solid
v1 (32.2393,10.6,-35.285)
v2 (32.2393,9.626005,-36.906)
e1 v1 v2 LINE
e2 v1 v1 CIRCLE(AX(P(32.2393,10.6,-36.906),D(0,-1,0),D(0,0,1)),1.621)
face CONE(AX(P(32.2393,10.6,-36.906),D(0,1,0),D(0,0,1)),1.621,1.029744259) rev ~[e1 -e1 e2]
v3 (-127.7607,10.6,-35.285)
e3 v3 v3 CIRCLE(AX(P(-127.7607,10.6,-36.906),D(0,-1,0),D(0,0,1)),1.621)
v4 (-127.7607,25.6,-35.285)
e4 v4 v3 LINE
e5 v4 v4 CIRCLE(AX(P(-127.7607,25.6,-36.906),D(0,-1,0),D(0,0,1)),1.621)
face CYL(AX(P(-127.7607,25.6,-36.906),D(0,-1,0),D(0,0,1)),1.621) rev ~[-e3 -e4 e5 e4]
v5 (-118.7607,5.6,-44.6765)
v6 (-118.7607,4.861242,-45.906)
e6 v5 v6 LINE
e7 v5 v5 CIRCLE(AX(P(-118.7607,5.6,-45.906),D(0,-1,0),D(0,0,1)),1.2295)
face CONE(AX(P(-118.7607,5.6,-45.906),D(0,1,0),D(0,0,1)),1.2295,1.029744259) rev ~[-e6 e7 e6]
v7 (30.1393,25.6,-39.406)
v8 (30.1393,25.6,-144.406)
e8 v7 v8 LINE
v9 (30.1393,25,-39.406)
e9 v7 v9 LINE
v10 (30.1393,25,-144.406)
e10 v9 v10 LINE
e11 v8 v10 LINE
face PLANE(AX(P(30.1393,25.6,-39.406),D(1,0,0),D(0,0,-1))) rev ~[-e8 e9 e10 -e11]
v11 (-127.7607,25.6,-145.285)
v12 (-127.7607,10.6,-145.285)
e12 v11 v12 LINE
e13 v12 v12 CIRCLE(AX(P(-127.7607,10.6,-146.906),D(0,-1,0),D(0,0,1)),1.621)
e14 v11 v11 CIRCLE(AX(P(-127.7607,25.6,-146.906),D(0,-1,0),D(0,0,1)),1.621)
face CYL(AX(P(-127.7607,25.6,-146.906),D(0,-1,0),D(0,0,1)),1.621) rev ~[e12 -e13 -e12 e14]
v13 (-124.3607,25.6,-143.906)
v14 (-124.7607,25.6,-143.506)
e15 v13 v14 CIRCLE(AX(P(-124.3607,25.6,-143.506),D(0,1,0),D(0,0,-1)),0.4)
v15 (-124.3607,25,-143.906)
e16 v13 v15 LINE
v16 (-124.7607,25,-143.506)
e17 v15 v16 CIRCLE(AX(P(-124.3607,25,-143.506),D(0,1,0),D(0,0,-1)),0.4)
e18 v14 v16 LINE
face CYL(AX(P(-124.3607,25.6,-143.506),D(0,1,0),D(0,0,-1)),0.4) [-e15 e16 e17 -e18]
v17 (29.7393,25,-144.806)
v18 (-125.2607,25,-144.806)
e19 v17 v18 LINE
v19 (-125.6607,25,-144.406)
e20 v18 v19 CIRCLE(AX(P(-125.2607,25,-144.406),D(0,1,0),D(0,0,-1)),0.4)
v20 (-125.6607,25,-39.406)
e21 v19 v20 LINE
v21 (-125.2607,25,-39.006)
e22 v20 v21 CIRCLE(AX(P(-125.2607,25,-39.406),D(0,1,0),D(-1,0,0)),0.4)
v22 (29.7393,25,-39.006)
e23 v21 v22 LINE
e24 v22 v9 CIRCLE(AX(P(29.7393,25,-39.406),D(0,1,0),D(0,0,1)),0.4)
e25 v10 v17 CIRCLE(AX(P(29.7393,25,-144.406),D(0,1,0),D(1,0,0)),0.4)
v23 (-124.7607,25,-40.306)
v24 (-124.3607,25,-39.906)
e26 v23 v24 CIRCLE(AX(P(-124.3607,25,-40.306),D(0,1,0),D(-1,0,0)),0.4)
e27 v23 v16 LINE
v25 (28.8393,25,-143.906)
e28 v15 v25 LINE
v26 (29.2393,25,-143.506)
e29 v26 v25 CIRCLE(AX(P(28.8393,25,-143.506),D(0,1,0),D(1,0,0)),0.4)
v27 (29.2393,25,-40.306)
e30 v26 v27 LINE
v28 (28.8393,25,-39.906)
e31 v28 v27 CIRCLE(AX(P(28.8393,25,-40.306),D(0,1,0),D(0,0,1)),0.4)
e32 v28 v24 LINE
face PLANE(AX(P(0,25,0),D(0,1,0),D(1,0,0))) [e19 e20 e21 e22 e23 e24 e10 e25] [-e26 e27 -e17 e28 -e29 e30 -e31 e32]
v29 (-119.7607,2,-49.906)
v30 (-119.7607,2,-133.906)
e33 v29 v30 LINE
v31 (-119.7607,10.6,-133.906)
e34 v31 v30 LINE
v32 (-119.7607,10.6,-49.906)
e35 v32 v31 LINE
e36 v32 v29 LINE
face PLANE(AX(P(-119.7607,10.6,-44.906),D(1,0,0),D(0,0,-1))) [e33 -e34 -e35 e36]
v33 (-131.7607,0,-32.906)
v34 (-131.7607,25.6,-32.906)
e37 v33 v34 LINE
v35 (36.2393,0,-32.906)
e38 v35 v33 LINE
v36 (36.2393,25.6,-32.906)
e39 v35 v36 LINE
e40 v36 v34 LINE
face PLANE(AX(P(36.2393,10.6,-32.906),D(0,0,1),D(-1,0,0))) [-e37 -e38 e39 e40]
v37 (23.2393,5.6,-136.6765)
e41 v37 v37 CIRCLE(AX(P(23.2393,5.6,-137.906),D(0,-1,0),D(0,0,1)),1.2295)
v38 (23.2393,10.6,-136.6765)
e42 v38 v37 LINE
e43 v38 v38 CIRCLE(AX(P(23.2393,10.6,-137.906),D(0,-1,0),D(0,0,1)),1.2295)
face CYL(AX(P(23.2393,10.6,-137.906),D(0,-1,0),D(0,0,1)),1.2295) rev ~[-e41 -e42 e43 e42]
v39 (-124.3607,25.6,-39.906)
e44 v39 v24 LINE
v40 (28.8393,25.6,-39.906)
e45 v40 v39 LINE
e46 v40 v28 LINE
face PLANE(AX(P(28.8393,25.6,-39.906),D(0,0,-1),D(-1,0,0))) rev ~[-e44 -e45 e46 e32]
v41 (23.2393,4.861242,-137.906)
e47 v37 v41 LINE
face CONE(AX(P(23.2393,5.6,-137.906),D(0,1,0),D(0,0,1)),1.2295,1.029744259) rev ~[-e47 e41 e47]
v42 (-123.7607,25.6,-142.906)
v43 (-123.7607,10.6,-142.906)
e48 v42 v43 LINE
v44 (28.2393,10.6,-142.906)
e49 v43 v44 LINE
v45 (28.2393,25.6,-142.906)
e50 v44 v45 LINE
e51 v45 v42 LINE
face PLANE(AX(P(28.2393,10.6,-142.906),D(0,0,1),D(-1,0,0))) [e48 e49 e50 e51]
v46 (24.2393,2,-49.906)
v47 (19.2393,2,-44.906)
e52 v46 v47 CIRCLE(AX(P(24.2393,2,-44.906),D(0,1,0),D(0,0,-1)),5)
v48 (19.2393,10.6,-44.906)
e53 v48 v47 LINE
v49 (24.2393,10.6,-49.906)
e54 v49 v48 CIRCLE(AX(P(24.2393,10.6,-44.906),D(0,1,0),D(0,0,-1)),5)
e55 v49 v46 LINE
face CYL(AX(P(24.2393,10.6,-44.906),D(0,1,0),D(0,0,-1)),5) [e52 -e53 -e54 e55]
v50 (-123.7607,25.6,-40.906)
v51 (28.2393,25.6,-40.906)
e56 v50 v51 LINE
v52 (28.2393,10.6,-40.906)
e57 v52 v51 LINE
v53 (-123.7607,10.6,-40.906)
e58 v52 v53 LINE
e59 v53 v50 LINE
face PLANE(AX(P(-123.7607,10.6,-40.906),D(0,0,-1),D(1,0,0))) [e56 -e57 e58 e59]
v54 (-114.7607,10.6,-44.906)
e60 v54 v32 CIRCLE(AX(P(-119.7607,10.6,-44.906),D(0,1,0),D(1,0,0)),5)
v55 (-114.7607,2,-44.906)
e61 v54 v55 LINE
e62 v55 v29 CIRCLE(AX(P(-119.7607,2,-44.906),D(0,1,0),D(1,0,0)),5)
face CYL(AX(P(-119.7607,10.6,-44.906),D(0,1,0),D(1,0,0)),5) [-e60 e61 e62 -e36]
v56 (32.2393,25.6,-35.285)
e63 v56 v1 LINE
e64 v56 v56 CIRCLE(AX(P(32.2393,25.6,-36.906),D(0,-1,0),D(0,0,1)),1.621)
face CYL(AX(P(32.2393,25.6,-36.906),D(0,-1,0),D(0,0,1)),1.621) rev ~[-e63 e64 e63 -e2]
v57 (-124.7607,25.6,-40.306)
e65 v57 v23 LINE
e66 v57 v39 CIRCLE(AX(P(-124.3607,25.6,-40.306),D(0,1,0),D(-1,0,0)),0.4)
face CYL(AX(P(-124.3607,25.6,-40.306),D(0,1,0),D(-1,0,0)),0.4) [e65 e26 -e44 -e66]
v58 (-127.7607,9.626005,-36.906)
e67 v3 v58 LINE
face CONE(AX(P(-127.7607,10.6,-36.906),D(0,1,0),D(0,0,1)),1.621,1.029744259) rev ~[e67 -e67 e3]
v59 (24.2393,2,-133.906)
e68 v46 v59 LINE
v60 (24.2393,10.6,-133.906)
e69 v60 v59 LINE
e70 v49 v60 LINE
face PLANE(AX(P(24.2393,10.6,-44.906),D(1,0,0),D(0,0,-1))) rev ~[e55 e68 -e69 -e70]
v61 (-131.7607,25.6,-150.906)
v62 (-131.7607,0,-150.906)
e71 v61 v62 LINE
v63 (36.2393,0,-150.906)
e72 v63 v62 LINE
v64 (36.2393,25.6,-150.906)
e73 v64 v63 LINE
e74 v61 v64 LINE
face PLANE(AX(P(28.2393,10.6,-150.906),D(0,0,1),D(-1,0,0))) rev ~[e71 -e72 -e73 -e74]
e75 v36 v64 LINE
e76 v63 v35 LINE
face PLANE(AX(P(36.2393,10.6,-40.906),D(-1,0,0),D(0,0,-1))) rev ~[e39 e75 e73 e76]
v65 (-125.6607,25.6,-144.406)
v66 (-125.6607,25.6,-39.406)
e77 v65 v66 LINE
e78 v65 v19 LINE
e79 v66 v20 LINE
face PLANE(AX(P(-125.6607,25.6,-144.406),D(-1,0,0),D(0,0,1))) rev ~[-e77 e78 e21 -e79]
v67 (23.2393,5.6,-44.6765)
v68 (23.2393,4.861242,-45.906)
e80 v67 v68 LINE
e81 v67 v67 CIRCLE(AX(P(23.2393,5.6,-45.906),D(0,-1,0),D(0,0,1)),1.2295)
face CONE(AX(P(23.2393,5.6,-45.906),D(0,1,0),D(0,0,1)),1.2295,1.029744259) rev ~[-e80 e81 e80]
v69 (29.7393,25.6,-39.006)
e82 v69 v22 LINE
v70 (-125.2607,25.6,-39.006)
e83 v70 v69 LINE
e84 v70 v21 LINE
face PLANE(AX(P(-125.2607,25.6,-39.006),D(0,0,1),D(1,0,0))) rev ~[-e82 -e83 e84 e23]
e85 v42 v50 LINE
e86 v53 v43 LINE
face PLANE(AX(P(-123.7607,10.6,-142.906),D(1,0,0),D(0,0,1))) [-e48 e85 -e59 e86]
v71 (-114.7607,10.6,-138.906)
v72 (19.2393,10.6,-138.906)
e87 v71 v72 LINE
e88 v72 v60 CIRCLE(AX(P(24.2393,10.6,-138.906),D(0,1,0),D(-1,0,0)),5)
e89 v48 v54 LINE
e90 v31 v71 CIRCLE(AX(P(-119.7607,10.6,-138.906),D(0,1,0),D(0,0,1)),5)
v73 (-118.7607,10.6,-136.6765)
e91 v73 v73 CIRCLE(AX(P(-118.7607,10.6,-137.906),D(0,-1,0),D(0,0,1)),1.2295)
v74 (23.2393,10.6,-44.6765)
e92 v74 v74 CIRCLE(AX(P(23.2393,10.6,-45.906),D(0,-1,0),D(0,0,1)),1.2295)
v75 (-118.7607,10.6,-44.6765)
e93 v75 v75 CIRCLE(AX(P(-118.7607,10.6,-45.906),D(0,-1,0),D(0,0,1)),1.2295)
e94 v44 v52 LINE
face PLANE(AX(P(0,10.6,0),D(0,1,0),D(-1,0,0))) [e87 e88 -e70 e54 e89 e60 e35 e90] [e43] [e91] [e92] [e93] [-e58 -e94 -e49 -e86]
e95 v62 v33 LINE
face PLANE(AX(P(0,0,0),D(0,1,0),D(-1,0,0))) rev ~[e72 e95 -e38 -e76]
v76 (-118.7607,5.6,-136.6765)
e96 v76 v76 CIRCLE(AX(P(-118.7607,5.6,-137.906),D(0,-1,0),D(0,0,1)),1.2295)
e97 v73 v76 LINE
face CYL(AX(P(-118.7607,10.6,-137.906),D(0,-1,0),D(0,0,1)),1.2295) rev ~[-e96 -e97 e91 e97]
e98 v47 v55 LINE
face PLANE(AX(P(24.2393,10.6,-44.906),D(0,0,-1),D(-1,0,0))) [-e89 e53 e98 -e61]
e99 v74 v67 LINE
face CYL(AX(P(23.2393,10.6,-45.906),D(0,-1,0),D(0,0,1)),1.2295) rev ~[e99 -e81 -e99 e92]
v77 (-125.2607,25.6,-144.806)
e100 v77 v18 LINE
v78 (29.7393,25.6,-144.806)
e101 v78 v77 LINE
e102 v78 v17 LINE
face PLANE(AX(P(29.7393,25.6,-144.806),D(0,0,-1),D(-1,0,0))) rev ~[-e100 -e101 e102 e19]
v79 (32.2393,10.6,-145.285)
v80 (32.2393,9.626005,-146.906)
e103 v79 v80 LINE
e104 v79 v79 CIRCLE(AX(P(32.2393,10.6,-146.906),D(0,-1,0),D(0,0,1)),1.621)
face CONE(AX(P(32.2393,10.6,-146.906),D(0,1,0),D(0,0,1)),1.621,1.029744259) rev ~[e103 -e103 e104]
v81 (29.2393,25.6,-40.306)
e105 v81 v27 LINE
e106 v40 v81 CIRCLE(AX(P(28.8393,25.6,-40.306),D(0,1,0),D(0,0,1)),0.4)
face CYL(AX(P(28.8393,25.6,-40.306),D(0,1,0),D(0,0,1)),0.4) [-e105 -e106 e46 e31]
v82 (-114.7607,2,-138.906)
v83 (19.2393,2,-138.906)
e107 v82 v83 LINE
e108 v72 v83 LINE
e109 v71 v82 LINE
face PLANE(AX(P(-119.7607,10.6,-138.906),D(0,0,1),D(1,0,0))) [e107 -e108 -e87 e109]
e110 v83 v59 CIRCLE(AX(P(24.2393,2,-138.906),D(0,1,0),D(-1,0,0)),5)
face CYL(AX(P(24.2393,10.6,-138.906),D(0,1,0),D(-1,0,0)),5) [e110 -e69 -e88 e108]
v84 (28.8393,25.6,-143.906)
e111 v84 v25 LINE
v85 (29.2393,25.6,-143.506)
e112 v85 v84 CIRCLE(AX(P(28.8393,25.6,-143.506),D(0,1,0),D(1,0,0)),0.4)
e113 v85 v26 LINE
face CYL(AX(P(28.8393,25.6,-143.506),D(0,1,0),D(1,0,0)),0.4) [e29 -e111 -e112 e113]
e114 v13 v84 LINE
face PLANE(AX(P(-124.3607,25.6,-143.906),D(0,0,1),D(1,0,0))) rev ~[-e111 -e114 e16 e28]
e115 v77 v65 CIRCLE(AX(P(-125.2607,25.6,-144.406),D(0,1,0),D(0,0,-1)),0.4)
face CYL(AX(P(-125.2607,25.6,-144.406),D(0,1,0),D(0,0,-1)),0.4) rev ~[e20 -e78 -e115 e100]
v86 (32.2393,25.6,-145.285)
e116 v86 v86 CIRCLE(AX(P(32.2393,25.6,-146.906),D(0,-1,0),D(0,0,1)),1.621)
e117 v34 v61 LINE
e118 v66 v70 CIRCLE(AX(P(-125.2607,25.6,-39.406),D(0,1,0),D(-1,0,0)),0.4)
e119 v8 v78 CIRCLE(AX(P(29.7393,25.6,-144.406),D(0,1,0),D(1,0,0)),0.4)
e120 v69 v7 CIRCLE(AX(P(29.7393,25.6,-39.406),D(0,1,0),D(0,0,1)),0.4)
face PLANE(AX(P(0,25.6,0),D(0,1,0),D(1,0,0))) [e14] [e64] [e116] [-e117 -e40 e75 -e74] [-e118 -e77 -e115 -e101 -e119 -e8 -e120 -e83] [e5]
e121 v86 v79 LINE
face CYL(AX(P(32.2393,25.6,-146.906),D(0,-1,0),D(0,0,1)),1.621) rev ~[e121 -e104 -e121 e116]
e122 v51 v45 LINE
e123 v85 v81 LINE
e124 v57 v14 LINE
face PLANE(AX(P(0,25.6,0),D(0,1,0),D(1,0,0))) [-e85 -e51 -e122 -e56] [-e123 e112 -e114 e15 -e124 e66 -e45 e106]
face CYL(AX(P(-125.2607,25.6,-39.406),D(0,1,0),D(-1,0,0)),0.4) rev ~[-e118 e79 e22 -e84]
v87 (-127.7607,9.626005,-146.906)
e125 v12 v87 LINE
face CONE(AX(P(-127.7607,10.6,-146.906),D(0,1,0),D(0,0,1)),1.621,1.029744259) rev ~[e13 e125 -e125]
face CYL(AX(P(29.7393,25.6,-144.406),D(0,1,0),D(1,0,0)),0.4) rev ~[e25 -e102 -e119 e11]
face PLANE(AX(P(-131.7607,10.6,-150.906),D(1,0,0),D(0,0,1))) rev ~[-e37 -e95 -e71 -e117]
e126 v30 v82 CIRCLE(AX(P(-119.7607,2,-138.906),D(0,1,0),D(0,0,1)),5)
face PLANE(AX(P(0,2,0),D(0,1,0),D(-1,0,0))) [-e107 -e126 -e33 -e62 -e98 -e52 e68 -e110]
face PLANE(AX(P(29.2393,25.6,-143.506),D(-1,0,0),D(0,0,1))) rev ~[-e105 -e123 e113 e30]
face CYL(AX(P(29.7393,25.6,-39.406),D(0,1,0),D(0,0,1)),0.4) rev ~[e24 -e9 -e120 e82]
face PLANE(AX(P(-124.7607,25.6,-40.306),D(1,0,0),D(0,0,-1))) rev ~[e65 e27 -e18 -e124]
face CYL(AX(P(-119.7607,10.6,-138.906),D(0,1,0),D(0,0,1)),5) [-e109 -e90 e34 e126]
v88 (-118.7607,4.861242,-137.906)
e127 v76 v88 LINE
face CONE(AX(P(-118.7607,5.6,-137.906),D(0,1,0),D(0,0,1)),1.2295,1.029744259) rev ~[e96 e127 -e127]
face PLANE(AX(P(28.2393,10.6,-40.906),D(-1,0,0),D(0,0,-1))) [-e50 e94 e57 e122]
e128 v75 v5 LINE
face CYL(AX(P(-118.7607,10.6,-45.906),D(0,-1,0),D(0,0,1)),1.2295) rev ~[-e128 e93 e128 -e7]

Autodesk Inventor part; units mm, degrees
ref_plane "YZ Plane" through (0, 0, 0) normal (1, 0, 0) x (0, 1, 0)
ref_plane "XZ Plane" through (0, 0, 0) normal (0, 1, 0) x (-1, 0, 0)
ref_plane "XY Plane" through (0, 0, 0) normal (0, 0, 1) x (1, 0, 0)
sketch "Esboço9" plane through (0, 0, 0) normal (0, 1, 0) x (-1, 0, 0)
  line L0 (123.7607, -142.906) -> (-28.2393, -142.906)
  line L1 (-28.2393, -142.906) -> (-28.2393, -40.906)
  line L2 (-28.2393, -40.906) -> (123.7607, -40.906)
  line L3 (123.7607, -40.906) -> (123.7607, -142.906)
  point P0 (0, 0)
  dimension "d42" = 152
  dimension "d43" = 102
extrude "Extrusão7" add sketch "Esboço9" along normal blind 10.6
shell "Casca2" thickness 2 removed faces 1 at (-22.4273, 10.6, -74.906)
sketch "Esboço10" plane through (0, 10.6, 0) normal (0, 1, 0) x (1, 0, 0)
  line L0 (-123.7607, 142.906) -> (-123.7607, 40.906) projected
  line L1 (-123.7607, 40.906) -> (28.2393, 40.906) projected
  line L2 (28.2393, 142.906) -> (-123.7607, 142.906) projected
  line L3 (28.2393, 40.906) -> (28.2393, 142.906) projected
  line L4 (-123.7607, 40.906) -> (-131.7607, 40.906)
  line L5 (-131.7607, 40.906) -> (-131.7607, 142.906)
  line L6 (-131.7607, 142.906) -> (-123.7607, 142.906)
  line L7 (-123.7607, 142.906) -> (-123.7607, 40.906)
  line L8 (-131.7607, 142.906) -> (28.2393, 142.906)
  line L9 (28.2393, 142.906) -> (28.2393, 150.906)
  line L10 (28.2393, 150.906) -> (-131.7607, 150.906)
  line L11 (-131.7607, 150.906) -> (-131.7607, 142.906)
  line L12 (28.2393, 40.906) -> (36.2393, 40.906)
  line L13 (36.2393, 40.906) -> (36.2393, 150.906)
  line L14 (36.2393, 150.906) -> (28.2393, 150.906)
  line L15 (28.2393, 150.906) -> (28.2393, 40.906)
  line L16 (-131.7607, 40.906) -> (36.2393, 40.906)
  line L17 (36.2393, 40.906) -> (36.2393, 32.906)
  line L18 (36.2393, 32.906) -> (-131.7607, 32.906)
  line L19 (-131.7607, 32.906) -> (-131.7607, 40.906)
  point P0 (0, 0)
  dimension "d47" = 8
  dimension "d48" = 8
  dimension "d49" = 8
  dimension "d50" = 8
extrude "Extrusão8" add sketch "Esboço10" along normal blind 15 and the other way blind 10.6 contours L6 L11 L10 L9 L2 | L0 L4 L5 L6 | L1 L12 L17 L18 L19 L4 | L9 L14 L13 L12 L3
sketch "Esboço11" plane through (0, 10.6, 0) normal (0, 1, 0) x (1, 0, 0)
  line L0 (-121.7607, 42.906) -> (-121.7607, 140.906) projected
  line L1 (26.2393, 42.906) -> (-121.7607, 42.906) projected
  line L2 (-121.7607, 140.906) -> (26.2393, 140.906) projected
  line L3 (26.2393, 140.906) -> (26.2393, 42.906) projected
  line L4 (-121.7607, 42.906) -> (-119.7607, 42.906)
  line L5 (-119.7607, 42.906) -> (-119.7607, 140.906)
  line L6 (-119.7607, 140.906) -> (-121.7607, 140.906)
  line L7 (-121.7607, 140.906) -> (-121.7607, 42.906)
  line L8 (26.2393, 140.906) -> (-121.7607, 140.906)
  line L9 (-121.7607, 140.906) -> (-121.7607, 138.906)
  line L10 (-121.7607, 138.906) -> (26.2393, 138.906)
  line L11 (26.2393, 138.906) -> (26.2393, 140.906)
  line L12 (-121.7607, 42.906) -> (26.2393, 42.906)
  line L13 (26.2393, 42.906) -> (26.2393, 44.906)
  line L14 (26.2393, 44.906) -> (-121.7607, 44.906)
  line L15 (-121.7607, 44.906) -> (-121.7607, 42.906)
  line L16 (26.2393, 42.906) -> (24.2393, 42.906)
  line L17 (24.2393, 42.906) -> (24.2393, 140.906)
  line L18 (24.2393, 140.906) -> (26.2393, 140.906)
  line L19 (26.2393, 140.906) -> (26.2393, 42.906)
  point P0 (0, 0)
  point P1 (-119.7607, 138.906)
  point P2 (24.2393, 138.906)
  point P3 (24.2393, 44.906)
  point P4 (-119.7607, 44.906)
  dimension "d55" = 2
  dimension "d56" = 2
  dimension "d57" = 2
  dimension "d58" = 2
extrude "Extrusão9" add sketch "Esboço11" against normal blind 8.6 contours L0 L14 L5 L1 | L0 L10 L5 L14 | L5 L14 L17 L1 | L0 L2 L5 L10 | L17 L14 L3 L1 | L5 L2 L17 L10 | L17 L10 L3 L14 | L17 L2 L3 L10
sketch "Esboço12" plane through (0, 10.6, 0) normal (0, 1, 0) x (1, 0, 0)
  line L0 (24.2393, 138.906) -> (24.2393, 44.906) projected
  line L1 (24.2393, 44.906) -> (-119.7607, 44.906) projected
  line L2 (-119.7607, 138.906) -> (24.2393, 138.906) projected
  line L3 (-119.7607, 44.906) -> (-119.7607, 138.906) projected
  arc A0 (19.2393, 138.906) -> (24.2393, 133.906) centre (24.2393, 138.906) ccw
  arc A1 (24.2393, 49.906) -> (19.2393, 44.906) centre (24.2393, 44.906) ccw
  arc A2 (-114.7607, 44.906) -> (-119.7607, 49.906) centre (-119.7607, 44.906) ccw
  arc A3 (-119.7607, 133.906) -> (-114.7607, 138.906) centre (-119.7607, 138.906) ccw
  point P0 (0, 0)
  dimension "d61" = 5
  dimension "d62" = 5
  dimension "d63" = 5
  dimension "d64" = 5
extrude "Extrusão10" add sketch "Esboço12" against normal blind 8.6 contours L0 A0 L2 | L0 L1 A1 | A3 L3 L2 | L1 L3 A2
sketch "Esboço13" plane through (0, 10.6, 0) normal (0, 1, 0) x (1, 0, 0)
  line L0 (28.2393, 40.906) -> (28.2393, 142.906) projected
  line L1 (-123.7607, 40.906) -> (28.2393, 40.906) projected
  point P0 (0, 0)
  point P1 (23.2393, 45.906)
  dimension "d67" = 5
  dimension "d68" = 5
hole "Furo2" at (23.2393, 10.6, -45.906) direction (0, -1, 0) diameter 2.459 depth 5 tip angle 118 thread size "M3x0.5" class "6H" standard "ISO Metric profile"
sketch "Esboço14" plane through (0, 10.6, 0) normal (0, 1, 0) x (1, 0, 0)
  line L0 (28.2393, 40.906) -> (28.2393, 142.906) projected
  line L1 (28.2393, 142.906) -> (-123.7607, 142.906) projected
  point P0 (0, 0)
  point P1 (23.2393, 137.906)
  dimension "d76" = 5
  dimension "d77" = 5
hole "Furo3" at (23.2393, 10.6, -137.906) direction (0, -1, 0) diameter 2.459 depth 5 tip angle 118 thread size "M3x0.5" class "6H" standard "ISO Metric profile"
sketch "Esboço15" plane through (0, 10.6, 0) normal (0, 1, 0) x (1, 0, 0)
  line L0 (28.2393, 142.906) -> (-123.7607, 142.906) projected
  line L1 (-123.7607, 142.906) -> (-123.7607, 40.906) projected
  point P0 (0, 0)
  point P1 (-118.7607, 137.906)
  dimension "d85" = 5
  dimension "d86" = 5
hole "Furo4" at (-118.7607, 10.6, -137.906) direction (0, -1, 0) diameter 2.459 depth 5 tip angle 118 thread size "M3x0.5" class "6H" standard "ISO Metric profile"
sketch "Esboço16" plane through (0, 10.6, 0) normal (0, 1, 0) x (1, 0, 0)
  line L0 (-123.7607, 142.906) -> (-123.7607, 40.906) projected
  line L1 (-123.7607, 40.906) -> (28.2393, 40.906) projected
  point P0 (0, 0)
  point P1 (-118.7607, 45.906)
  dimension "d94" = 5
  dimension "d95" = 5
hole "Furo5" at (-118.7607, 10.6, -45.906) direction (0, -1, 0) diameter 2.459 depth 5 tip angle 118 thread size "M3x0.5" class "6H" standard "ISO Metric profile"
sketch "Esboço18" plane through (0, 25.6, 0) normal (0, 1, 0) x (1, 0, 0)
  point P0 (0, 0)
sketch "Esboço19" plane through (0, 25.6, 0) normal (0, 1, 0) x (1, 0, 0)
  point P0 (0, 0)
sketch "Esboço20" plane through (0, 25.6, 0) normal (0, 1, 0) x (1, 0, 0)
  line L0 (-131.7607, 32.906) -> (36.2393, 32.906) projected
  line L1 (-131.7607, 150.906) -> (-131.7607, 32.906) projected
  point P0 (0, 0)
  point P1 (-127.7607, 36.906)
  dimension "d104" = 4
  dimension "d105" = 4
hole "Furo6" at (-127.7607, 25.6, -36.906) direction (0, -1, 0) diameter 3.242 depth 15 tip angle 118 thread size "M4x0.7" class "6H" standard "ISO Metric profile"
sketch "Esboço21" plane through (0, 25.6, 0) normal (0, 1, 0) x (1, 0, 0)
  line L0 (28.2393, 142.906) -> (28.2393, 40.906) projected
  line L1 (-124.3607, 143.906) -> (28.8393, 143.906)
  line L2 (29.2393, 143.506) -> (29.2393, 40.306)
  line L3 (28.8393, 39.906) -> (-124.3607, 39.906)
  line L4 (-124.7607, 40.306) -> (-124.7607, 143.506)
  line L5 (-125.2607, 39.006) -> (29.7393, 39.006)
  line L6 (30.1393, 39.406) -> (30.1393, 144.406)
  line L7 (29.7393, 144.806) -> (-125.2607, 144.806)
  line L8 (-125.6607, 144.406) -> (-125.6607, 39.406)
  arc A0 (-125.6607, 39.406) -> (-125.2607, 39.006) centre (-125.2607, 39.406) ccw
  arc A1 (-124.7607, 40.306) -> (-124.3607, 39.906) centre (-124.3607, 40.306) ccw
  arc A2 (-124.3607, 143.906) -> (-124.7607, 143.506) centre (-124.3607, 143.506) ccw
  arc A3 (-125.2607, 144.806) -> (-125.6607, 144.406) centre (-125.2607, 144.406) ccw
  arc A4 (28.8393, 39.906) -> (29.2393, 40.306) centre (28.8393, 40.306) ccw
  arc A5 (29.7393, 39.006) -> (30.1393, 39.406) centre (29.7393, 39.406) ccw
  arc A6 (29.2393, 143.506) -> (28.8393, 143.906) centre (28.8393, 143.506) ccw
  arc A7 (30.1393, 144.406) -> (29.7393, 144.806) centre (29.7393, 144.406) ccw
  point P0 (0, 0)
  point P1 (-123.7607, 40.906)
  dimension "d117" = 0.9
  dimension "d118" = 0.4
extrude "Extrusão11" cut sketch "Esboço21" against normal blind 0.6
sketch "Esboço22" plane through (0, 25.6, 0) normal (0, 1, 0) x (1, 0, 0)
  line L0 (-131.7607, 150.906) -> (-131.7607, 32.906) projected
  line L1 (36.2393, 150.906) -> (-131.7607, 150.906) projected
  line L2 (36.2393, 32.906) -> (36.2393, 150.906) projected
  line L3 (-131.7607, 32.906) -> (36.2393, 32.906) projected
  point P0 (0, 0)
  point P1 (-127.7607, 146.906)
  point P2 (32.2393, 146.906)
  point P3 (32.2393, 36.906)
  dimension "d121" = 4
  dimension "d122" = 4
  dimension "d123" = 4
  dimension "d124" = 4
  dimension "d125" = 4
  dimension "d126" = 4
hole "Furo7" at (-127.7607, 25.6, -146.906) at (32.2393, 25.6, -146.906) at (32.2393, 25.6, -36.906) direction (0, -1, 0) diameter 3.242 depth 15 tip angle 118 thread size "M4x0.7" class "6H" standard "ISO Metric profile"
properties part number "peça pi2"
